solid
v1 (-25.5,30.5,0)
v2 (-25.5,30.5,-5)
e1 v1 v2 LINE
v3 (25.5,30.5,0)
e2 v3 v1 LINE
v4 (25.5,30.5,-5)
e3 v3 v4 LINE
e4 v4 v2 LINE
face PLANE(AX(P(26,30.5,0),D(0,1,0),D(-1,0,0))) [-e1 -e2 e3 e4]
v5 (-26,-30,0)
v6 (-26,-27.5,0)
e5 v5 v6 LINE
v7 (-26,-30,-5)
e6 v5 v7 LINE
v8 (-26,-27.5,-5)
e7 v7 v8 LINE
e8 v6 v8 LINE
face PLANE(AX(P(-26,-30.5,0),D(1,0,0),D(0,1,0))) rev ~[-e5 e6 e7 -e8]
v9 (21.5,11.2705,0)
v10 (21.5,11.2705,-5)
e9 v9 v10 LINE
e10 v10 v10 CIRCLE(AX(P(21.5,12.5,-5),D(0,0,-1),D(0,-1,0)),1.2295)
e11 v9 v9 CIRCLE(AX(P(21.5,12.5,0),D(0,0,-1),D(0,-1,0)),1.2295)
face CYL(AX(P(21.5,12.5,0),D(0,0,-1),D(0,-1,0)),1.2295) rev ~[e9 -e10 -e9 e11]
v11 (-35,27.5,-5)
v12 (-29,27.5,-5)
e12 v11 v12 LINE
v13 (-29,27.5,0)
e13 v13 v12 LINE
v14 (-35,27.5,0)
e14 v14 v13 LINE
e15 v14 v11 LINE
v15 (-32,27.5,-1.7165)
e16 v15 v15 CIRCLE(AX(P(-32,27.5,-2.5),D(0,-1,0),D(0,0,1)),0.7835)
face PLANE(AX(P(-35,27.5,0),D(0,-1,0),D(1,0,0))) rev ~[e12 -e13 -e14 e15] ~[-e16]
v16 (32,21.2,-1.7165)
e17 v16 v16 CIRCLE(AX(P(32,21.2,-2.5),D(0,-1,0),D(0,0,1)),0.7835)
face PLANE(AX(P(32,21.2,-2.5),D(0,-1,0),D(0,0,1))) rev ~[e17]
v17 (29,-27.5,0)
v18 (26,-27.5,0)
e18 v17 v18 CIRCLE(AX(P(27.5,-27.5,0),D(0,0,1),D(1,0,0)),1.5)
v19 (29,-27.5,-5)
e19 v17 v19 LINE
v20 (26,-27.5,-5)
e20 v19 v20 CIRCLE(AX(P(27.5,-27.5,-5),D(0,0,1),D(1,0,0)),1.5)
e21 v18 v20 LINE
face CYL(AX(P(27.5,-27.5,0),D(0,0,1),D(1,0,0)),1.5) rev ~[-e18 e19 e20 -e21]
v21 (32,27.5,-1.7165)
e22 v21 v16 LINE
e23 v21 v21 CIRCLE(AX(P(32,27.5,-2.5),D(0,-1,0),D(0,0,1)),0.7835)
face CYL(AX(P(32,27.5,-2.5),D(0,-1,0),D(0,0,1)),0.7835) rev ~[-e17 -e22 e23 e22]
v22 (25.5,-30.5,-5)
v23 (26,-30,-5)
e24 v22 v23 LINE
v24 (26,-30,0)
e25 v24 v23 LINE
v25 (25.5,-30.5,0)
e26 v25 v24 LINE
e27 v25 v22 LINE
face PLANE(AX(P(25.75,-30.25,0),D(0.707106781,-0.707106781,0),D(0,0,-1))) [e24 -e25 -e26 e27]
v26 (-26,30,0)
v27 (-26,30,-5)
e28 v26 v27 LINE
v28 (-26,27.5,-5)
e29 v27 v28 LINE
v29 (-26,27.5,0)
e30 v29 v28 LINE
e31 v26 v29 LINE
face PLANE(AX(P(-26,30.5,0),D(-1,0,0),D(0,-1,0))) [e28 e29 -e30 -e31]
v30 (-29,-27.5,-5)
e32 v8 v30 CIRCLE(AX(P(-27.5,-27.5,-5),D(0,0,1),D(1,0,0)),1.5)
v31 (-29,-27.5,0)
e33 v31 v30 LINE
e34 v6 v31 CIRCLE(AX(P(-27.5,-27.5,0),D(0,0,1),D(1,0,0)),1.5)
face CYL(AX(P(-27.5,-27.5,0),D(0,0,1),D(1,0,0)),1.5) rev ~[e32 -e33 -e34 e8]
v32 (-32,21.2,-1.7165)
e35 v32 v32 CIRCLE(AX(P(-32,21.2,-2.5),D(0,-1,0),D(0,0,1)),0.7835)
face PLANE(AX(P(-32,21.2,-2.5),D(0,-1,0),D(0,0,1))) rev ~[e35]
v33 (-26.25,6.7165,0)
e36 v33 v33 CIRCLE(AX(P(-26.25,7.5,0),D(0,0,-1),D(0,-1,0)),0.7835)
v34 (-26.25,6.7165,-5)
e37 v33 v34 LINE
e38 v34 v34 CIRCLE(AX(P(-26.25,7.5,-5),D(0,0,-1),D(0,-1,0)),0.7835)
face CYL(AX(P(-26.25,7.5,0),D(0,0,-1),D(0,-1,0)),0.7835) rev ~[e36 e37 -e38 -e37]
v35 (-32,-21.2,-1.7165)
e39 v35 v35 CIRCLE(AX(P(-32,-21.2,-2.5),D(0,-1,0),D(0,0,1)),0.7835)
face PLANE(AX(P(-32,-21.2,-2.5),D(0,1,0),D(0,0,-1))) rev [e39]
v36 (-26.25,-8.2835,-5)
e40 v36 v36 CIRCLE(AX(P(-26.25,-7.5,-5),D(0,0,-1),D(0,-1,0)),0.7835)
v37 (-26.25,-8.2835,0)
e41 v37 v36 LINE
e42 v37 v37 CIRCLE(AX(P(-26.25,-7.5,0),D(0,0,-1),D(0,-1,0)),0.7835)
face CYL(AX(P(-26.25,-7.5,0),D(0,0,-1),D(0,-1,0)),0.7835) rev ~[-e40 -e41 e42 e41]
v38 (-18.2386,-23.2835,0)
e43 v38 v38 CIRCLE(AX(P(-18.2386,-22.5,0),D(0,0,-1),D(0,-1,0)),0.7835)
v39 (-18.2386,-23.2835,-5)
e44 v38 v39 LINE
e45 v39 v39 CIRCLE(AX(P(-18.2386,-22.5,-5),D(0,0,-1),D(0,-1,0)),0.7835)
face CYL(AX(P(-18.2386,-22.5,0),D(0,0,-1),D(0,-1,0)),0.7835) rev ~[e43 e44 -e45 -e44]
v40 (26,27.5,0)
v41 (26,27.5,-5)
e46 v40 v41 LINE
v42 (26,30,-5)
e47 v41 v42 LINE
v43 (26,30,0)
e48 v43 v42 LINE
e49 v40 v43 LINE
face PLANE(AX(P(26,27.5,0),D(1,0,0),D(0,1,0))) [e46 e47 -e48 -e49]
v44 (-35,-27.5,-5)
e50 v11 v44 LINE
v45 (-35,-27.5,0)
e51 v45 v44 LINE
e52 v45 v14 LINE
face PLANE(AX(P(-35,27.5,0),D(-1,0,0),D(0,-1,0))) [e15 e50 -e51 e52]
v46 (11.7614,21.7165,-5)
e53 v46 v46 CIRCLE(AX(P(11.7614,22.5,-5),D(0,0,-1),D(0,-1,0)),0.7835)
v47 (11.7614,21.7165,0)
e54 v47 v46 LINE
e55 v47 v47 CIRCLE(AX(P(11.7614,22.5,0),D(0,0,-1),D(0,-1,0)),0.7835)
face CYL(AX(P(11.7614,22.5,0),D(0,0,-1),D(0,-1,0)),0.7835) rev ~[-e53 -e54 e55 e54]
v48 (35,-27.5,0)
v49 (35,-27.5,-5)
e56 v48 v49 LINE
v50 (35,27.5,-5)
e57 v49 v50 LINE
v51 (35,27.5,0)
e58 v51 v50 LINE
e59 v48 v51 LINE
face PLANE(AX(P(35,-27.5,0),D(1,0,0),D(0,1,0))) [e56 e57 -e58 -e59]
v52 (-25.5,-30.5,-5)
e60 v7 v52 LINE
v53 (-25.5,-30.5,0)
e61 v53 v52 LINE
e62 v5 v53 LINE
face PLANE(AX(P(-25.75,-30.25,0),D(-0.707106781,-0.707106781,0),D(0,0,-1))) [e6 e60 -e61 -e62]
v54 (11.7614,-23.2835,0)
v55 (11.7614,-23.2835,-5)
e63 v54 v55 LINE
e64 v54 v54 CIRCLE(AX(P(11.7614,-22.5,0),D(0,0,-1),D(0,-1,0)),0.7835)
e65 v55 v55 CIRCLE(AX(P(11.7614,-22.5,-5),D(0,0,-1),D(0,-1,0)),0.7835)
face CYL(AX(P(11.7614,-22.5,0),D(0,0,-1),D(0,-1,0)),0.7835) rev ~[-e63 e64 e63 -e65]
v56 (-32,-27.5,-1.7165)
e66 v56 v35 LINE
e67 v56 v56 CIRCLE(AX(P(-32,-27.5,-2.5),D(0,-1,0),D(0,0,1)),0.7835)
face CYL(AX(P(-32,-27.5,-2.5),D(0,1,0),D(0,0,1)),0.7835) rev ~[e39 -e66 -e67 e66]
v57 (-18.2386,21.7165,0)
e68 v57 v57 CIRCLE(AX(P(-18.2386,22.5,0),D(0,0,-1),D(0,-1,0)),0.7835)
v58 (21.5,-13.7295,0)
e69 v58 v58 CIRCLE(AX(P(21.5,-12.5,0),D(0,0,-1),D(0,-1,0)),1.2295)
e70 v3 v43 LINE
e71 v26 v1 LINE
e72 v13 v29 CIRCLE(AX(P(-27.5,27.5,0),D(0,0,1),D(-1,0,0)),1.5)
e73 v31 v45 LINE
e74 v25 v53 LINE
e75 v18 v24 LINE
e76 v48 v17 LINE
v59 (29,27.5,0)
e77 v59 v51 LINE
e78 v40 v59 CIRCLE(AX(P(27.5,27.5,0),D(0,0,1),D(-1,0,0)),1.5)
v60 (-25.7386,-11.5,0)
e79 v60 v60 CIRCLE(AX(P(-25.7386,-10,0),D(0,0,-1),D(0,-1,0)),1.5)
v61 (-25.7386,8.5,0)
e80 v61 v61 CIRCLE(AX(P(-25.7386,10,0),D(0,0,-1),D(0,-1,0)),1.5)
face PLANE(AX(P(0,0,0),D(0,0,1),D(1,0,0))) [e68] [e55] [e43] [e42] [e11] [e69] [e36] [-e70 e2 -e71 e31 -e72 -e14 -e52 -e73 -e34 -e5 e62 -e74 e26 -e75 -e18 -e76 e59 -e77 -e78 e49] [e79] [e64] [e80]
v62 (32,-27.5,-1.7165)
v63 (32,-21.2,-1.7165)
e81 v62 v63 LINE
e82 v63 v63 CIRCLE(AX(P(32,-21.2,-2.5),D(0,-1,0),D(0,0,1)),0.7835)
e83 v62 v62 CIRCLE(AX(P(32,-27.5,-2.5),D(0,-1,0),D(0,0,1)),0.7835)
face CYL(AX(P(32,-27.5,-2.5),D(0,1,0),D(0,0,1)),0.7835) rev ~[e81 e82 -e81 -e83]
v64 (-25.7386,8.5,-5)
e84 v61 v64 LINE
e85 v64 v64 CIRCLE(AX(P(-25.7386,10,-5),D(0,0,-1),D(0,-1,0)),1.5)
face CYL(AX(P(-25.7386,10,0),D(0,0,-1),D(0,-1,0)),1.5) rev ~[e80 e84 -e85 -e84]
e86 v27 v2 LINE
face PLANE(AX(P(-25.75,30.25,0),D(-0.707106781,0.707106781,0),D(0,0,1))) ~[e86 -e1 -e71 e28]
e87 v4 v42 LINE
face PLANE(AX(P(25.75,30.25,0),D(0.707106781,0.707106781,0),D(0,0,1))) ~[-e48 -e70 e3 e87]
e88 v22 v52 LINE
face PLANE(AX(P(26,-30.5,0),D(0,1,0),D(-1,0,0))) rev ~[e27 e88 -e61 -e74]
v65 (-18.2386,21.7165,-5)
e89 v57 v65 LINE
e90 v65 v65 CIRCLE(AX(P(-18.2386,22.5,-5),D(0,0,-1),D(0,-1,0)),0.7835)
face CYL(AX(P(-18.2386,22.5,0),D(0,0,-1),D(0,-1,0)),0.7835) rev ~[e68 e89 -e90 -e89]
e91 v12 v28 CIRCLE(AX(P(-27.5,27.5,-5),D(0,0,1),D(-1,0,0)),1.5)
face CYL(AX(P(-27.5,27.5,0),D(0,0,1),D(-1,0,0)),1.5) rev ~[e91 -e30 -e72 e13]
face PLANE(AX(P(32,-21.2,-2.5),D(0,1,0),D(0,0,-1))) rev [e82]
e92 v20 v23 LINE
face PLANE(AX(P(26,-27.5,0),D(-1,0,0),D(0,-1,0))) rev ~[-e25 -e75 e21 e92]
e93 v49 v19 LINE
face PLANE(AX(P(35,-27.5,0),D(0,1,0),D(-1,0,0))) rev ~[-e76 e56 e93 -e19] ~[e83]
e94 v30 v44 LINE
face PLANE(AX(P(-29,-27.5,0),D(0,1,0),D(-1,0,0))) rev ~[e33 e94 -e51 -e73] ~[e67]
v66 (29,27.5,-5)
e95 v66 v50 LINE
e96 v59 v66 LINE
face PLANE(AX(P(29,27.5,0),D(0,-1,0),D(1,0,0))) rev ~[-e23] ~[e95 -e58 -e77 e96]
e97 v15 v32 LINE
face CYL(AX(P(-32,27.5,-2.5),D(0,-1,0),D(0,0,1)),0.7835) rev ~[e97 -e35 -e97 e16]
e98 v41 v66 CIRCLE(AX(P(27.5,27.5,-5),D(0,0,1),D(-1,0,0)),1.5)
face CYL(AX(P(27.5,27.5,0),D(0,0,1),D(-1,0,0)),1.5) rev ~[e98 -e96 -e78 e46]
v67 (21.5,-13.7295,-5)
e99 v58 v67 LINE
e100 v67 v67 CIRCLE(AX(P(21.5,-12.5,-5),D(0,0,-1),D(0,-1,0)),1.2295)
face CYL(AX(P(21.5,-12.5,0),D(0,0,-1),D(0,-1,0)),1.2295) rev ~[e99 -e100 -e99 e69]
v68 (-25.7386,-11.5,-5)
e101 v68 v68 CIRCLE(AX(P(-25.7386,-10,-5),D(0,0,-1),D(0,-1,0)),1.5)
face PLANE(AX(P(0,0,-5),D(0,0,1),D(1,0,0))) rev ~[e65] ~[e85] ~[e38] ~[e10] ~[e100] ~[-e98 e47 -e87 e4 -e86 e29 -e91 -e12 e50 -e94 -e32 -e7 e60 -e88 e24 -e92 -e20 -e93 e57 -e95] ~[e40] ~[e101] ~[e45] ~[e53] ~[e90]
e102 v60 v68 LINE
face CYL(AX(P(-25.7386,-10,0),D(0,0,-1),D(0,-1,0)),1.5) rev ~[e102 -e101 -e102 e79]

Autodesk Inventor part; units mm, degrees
ref_plane "YZ Plane" through (0, 0, 0) normal (1, 0, 0) x (0, 1, 0)
ref_plane "XZ Plane" through (0, 0, 0) normal (0, 1, 0) x (-1, 0, 0)
ref_plane "XY Plane" through (0, 0, 0) normal (0, 0, 1) x (1, 0, 0)
sketch "Sketch1" plane through (0, 0, 0) normal (0, 0, 1) x (1, 0, 0)
  line L0 (35, 27.5) -> (-35, 27.5) construction
  line L1 (-35, 27.5) -> (-35, -27.5)
  line L2 (-35, -27.5) -> (35, -27.5) construction
  line L3 (35, -27.5) -> (35, 27.5)
  line L4 (35, 27.5) -> (-35, -27.5) construction
  line L5 (-35, 27.5) -> (35, -27.5) construction
  line L6 (0, 27.5) -> (0, -27.5) construction
  line L7 (35, 0) -> (-35, 0) construction
  line L8 (26, 27.5) -> (26, 30.5)
  line L9 (26, 30.5) -> (-26, 30.5)
  line L10 (-26, 30.5) -> (-26, 27.5)
  arc A0 (-29, 27.5) -> (-26, 27.5) centre (-27.5, 27.5) ccw
  line L11 (26, -27.5) -> (26, -30.5)
  line L12 (26, -30.5) -> (-26, -30.5)
  line L13 (-26, -30.5) -> (-26, -27.5)
  arc A1 (-26, -27.5) -> (-29, -27.5) centre (-27.5, -27.5) ccw
  line L14 (-32, 27.5) -> (-32, 21.5) construction
  line L15 (0, 30.5) -> (0, 27.5) construction
  line L16 (32, 27.5) -> (32, 21.5) construction
  arc A2 (26, 27.5) -> (29, 27.5) centre (27.5, 27.5) ccw
  arc A3 (29, -27.5) -> (26, -27.5) centre (27.5, -27.5) ccw
  line L17 (-17.5, -10) -> (-35, -10) construction
  line L18 (-35, -10) -> (-35, 10) construction
  line L19 (-35, 10) -> (-17.5, 10) construction
  line L20 (-17.5, 10) -> (-17.5, -10) construction
  line L21 (-17.5, -10) -> (-35, 10) construction
  line L22 (-35, -10) -> (-17.5, 10) construction
  line L23 (-26.25, -7.5) -> (-26.25, 7.5) construction
  line L24 (-25.7386, -10) -> (-25.7386, 10) construction
  circle A4 centre (-25.7386, 10) radius 2.5 construction
  line L25 (-33, 3.75) -> (-32, 3.75)
  line L26 (-30, 1.75) -> (-30, -1.75)
  line L27 (-32, -3.75) -> (-33, -3.75)
  arc A5 (-32, -3.75) -> (-30, -1.75) centre (-32, -1.75) ccw
  arc A6 (-30, 1.75) -> (-32, 3.75) centre (-32, 1.75) ccw
  arc A7 (-35, 5.75) -> (-33, 3.75) centre (-33, 5.75) ccw
  line L28 (35, -27.5) -> (29, -27.5)
  line L29 (-29, -27.5) -> (-35, -27.5)
  line L30 (-35, 27.5) -> (-29, 27.5)
  line L31 (29, 27.5) -> (35, 27.5)
  circle A8 centre (-26.25, 7.5) radius 2.5 construction
  line L32 (14.2614, -25) -> (-20.7386, -25) construction
  line L33 (-20.7386, -25) -> (-20.7386, 25) construction
  line L34 (-20.7386, 25) -> (14.2614, 25) construction
  line L35 (14.2614, 25) -> (14.2614, -25) construction
  line L36 (14.2614, -25) -> (-20.7386, 25) construction
  line L37 (-20.7386, -25) -> (14.2614, 25) construction
  line L38 (11.7614, 22.5) -> (-18.2386, 22.5) construction
  line L39 (-18.2386, 22.5) -> (-18.2386, -22.5) construction
  line L40 (-18.2386, -22.5) -> (11.7614, -22.5) construction
  line L41 (11.7614, -22.5) -> (11.7614, 22.5) construction
  line L42 (11.7614, 22.5) -> (-18.2386, -22.5) construction
  line L43 (-18.2386, 22.5) -> (11.7614, -22.5) construction
  circle A9 centre (-18.2386, 22.5) radius 2.5 construction
  arc A10 (-21.2236, 22.2) -> (-15.2536, 22.2) centre (-18.2386, 22.5) ccw
  line L44 (-21.2386, 10) -> (-21.2386, 3)
  line L45 (-13.2637, 24) -> (6.7865, 24)
  arc A11 (8.7764, 22.2) -> (14.7464, 22.2) centre (11.7614, 22.5) ccw
  arc A12 (32.802, 10.6698) -> (32.3609, 9.408) centre (46.2004, 5.2778) ccw
  line L46 (32.9466, 11.4165) -> (32.9466, 22)
  line L47 (30.9466, 24) -> (16.7363, 24)
  arc A13 (32.802, 10.6698) -> (32.9466, 11.4165) centre (30.9466, 11.4165) ccw
  line L48 (34.9466, 11.4165) -> (32.9466, 11.4165) construction
  line L49 (32.802, 8.6698) -> (32.802, 10.6698) construction
  line L50 (30.4444, 7.9799) -> (22.1342, 7.9799)
  line L51 (15.9549, 1.8007) -> (15.9549, 3)
  line L52 (13.9549, 1) -> (-19.2386, 1)
  arc A14 (30.4444, 7.9799) -> (32.3609, 9.408) centre (30.4444, 9.9799) ccw
  arc A15 (32.9466, 22) -> (30.9466, 24) centre (30.9466, 22) ccw
  arc A16 (16.7363, 24) -> (14.7464, 22.2) centre (16.7363, 22) ccw
  arc A17 (8.7764, 22.2) -> (6.7865, 24) centre (6.7865, 22) ccw
  arc A18 (-13.2637, 24) -> (-15.2536, 22.2) centre (-13.2637, 22) ccw
  arc A19 (-21.2386, 3) -> (-19.2386, 1) centre (-19.2386, 3) ccw
  arc A20 (13.9549, 1) -> (15.9549, 3) centre (13.9549, 3) ccw
  arc A21 (22.1342, 7.9799) -> (15.9549, 1.8007) centre (22.1342, 1.8007) ccw
  arc A22 (-15.2536, -22.2) -> (-21.2236, -22.2) centre (-18.2386, -22.5) ccw
  line L53 (-21.2386, -10) -> (-21.2386, -3)
  line L54 (-13.2637, -24) -> (6.7865, -24)
  arc A23 (14.7464, -22.2) -> (8.7764, -22.2) centre (11.7614, -22.5) ccw
  arc A24 (32.3609, -9.408) -> (32.802, -10.6698) centre (46.2004, -5.2778) ccw
  line L55 (32.9466, -11.4165) -> (32.9466, -22)
  line L56 (30.9466, -24) -> (16.7363, -24)
  arc A25 (32.9466, -11.4165) -> (32.802, -10.6698) centre (30.9466, -11.4165) ccw
  line L57 (30.4444, -7.9799) -> (22.1342, -7.9799)
  line L58 (15.9549, -1.8007) -> (15.9549, -3)
  line L59 (13.9549, -1) -> (-19.2386, -1)
  arc A26 (32.3609, -9.408) -> (30.4444, -7.9799) centre (30.4444, -9.9799) ccw
  arc A27 (30.9466, -24) -> (32.9466, -22) centre (30.9466, -22) ccw
  arc A28 (14.7464, -22.2) -> (16.7363, -24) centre (16.7363, -22) ccw
  arc A29 (6.7865, -24) -> (8.7764, -22.2) centre (6.7865, -22) ccw
  arc A30 (-15.2536, -22.2) -> (-13.2637, -24) centre (-13.2637, -22) ccw
  arc A31 (-19.2386, -1) -> (-21.2386, -3) centre (-19.2386, -3) ccw
  arc A32 (15.9549, -3) -> (13.9549, -1) centre (13.9549, -3) ccw
  arc A33 (15.9549, -1.8007) -> (22.1342, -7.9799) centre (22.1342, -1.8007) ccw
  line L60 (-32.9466, 13.8893) -> (-32.9466, 22)
  arc A34 (-30.9466, 24) -> (-32.9466, 22) centre (-30.9466, 22) ccw
  arc A35 (-21.2236, 22.2) -> (-23.2135, 24) centre (-23.2135, 22) ccw
  line L61 (-30.9466, 24) -> (-23.2135, 24)
  arc A36 (-21.2386, 10) -> (-29.3442, 12.6926) centre (-25.7386, 10) ccw
  arc A37 (-32.9466, 13.8893) -> (-29.3442, 12.6926) centre (-30.9466, 13.8893) ccw
  line L62 (-32.9466, -13.8893) -> (-32.9466, -22)
  arc A38 (-32.9466, -22) -> (-30.9466, -24) centre (-30.9466, -22) ccw
  line L63 (-30.9466, -24) -> (-23.2135, -24)
  arc A39 (-29.3442, -12.6926) -> (-21.2386, -10) centre (-25.7386, -10) ccw
  arc A40 (-29.3442, -12.6926) -> (-32.9466, -13.8893) centre (-30.9466, -13.8893) ccw
  arc A41 (-23.2135, -24) -> (-21.2236, -22.2) centre (-23.2135, -22) ccw
  line L64 (25, -16) -> (-25, -16) construction
  line L65 (-25, -16) -> (-25, 16) construction
  line L66 (-25, 16) -> (25, 16) construction
  line L67 (25, 16) -> (25, -16) construction
  line L68 (25, -16) -> (-25, 16) construction
  line L69 (-25, -16) -> (25, 16) construction
  line L70 (21.5, -12.5) -> (21.5, 12.5) construction
  point P0 (0, 0)
  point P1 (0, 0)
  point P2 (0, -0.0008)
  point P3 (-29, -27.5)
  point P4 (26, -27.5)
  point P5 (-26, -27.5)
  point P6 (-26, -27.5)
  point P7 (26, -27.5)
  point P8 (-26.25, 0)
  point P9 (29, -27.5)
  point P10 (29, -10)
  point P11 (-3.2386, 0)
  point P12 (-21.2386, 22.5)
  point P13 (-15.6405, 24)
  point P14 (9.1633, 24)
  point P15 (14.3595, 24)
  point P16 (32.0128, 7.9799)
  point P17 (0, 0)
  dimension "d19" = 3
  dimension "d20" = 52
  dimension "d37" = 55
  dimension "d40" = 6
  dimension "d41" = 6
  dimension "d59" = 70
  dimension "d60" = 1.5
  dimension "d61" = 17.5
  dimension "d62" = 20
  dimension "d63" = 15
  dimension "d90" = 20
  dimension "d98" = 5
  dimension "d100" = 7.5
  dimension "d101" = 5
  dimension "d111" = 5
  dimension "d113" = 50
  dimension "d114" = 35
  dimension "d115" = 5
  dimension "d117" = 5
  dimension "d118" = 2
  dimension "d119" = 2
  dimension "d120" = 2
  dimension "d124" = 2
  dimension "d125" = 2
  dimension "d126" = 3
  dimension "d128" = 50
  dimension "d129" = 32
  dimension "d130" = 25
  dimension "d131" = 3.5
  dimension "d140" = 0
  dimension "d141" = 10
extrude "Extrusion1" add sketch "Sketch1" against normal blind 5 contours L30 A0 L10 L9 L8 A2 L31 L3 L28 A3 L11 L12 L13 A1 L29 L1 | A10 A18 L45 A17 A11 A16 L47 A15 L46 A13 A12 A14 L50 A21 L51 A20 L52 A19 L44 A36 A37 L60 A34 L61 A35 | A22 A41 L63 A38 L62 A40 A39 L53 A31 L59 A32 L58 A33 L57 A26 A24 A25 L55 A27 L56 A28 A23 A29 L54 A30
hole "M2" at (-26.25, -7.5, 0) at (-26.25, 7.5, 0) at (11.7614, 22.5, 0) at (-18.2386, 22.5, 0) at (-18.2386, -22.5, 0) at (11.7614, -22.5, 0) direction (0, 0, -1) diameter 1.567 end through all thread size "M2x0.4" class "6H" standard "ANSI Metric M Profile"
hole "Phi3" at (-25.7386, -10, 0) at (-25.7386, 10, 0) direction (0, 0, -1) diameter 3 end through all
sketch "Sketch3" plane through (29, 27.5, 0) normal (0, 1, 0) x (1, 0, 0)
  line L0 (6, 0) -> (0, 0) projected
  line L1 (3, 0) -> (3, 5)
  line L2 (-58, 0) -> (-64, 0) projected
  line L3 (-61, 0) -> (-61, 5)
  line L4 (-64, 5) -> (-58, 5) projected
  line L5 (0, 5) -> (6, 5) projected
  point P0 (-29, 0)
  point P1 (3, 0)
  point P2 (3, 2.5)
  point P3 (-61, 2.5)
hole "Side-M2" at (32, 27.5, -2.5) at (-32, 27.5, -2.5) direction (0, -1, 0) diameter 1.567 depth 6.3 thread size "M2x0.4" class "6H" standard "ANSI Metric M Profile"
chamfer "C0.5" distance 0.5 angle 45 4 edges at (26, -30.5, -2.5) (-26, -30.5, -2.5) (26, 30.5, -2.5) (-26, 30.5, -2.5)
mirror "Mirror1" about plane through (0, 0, 0) normal (0, 1, 0) of "Side-M2"
hole "Hole6" at (21.5, -12.5, 0) at (21.5, 12.5, 0) direction (0, 0, -1) diameter 2.459 end through all thread size "M3x0.5" class "6H" standard "ANSI Metric M Profile"
properties part number "HeadCircuitMountFrame" material "Acetal Resin, Black"
